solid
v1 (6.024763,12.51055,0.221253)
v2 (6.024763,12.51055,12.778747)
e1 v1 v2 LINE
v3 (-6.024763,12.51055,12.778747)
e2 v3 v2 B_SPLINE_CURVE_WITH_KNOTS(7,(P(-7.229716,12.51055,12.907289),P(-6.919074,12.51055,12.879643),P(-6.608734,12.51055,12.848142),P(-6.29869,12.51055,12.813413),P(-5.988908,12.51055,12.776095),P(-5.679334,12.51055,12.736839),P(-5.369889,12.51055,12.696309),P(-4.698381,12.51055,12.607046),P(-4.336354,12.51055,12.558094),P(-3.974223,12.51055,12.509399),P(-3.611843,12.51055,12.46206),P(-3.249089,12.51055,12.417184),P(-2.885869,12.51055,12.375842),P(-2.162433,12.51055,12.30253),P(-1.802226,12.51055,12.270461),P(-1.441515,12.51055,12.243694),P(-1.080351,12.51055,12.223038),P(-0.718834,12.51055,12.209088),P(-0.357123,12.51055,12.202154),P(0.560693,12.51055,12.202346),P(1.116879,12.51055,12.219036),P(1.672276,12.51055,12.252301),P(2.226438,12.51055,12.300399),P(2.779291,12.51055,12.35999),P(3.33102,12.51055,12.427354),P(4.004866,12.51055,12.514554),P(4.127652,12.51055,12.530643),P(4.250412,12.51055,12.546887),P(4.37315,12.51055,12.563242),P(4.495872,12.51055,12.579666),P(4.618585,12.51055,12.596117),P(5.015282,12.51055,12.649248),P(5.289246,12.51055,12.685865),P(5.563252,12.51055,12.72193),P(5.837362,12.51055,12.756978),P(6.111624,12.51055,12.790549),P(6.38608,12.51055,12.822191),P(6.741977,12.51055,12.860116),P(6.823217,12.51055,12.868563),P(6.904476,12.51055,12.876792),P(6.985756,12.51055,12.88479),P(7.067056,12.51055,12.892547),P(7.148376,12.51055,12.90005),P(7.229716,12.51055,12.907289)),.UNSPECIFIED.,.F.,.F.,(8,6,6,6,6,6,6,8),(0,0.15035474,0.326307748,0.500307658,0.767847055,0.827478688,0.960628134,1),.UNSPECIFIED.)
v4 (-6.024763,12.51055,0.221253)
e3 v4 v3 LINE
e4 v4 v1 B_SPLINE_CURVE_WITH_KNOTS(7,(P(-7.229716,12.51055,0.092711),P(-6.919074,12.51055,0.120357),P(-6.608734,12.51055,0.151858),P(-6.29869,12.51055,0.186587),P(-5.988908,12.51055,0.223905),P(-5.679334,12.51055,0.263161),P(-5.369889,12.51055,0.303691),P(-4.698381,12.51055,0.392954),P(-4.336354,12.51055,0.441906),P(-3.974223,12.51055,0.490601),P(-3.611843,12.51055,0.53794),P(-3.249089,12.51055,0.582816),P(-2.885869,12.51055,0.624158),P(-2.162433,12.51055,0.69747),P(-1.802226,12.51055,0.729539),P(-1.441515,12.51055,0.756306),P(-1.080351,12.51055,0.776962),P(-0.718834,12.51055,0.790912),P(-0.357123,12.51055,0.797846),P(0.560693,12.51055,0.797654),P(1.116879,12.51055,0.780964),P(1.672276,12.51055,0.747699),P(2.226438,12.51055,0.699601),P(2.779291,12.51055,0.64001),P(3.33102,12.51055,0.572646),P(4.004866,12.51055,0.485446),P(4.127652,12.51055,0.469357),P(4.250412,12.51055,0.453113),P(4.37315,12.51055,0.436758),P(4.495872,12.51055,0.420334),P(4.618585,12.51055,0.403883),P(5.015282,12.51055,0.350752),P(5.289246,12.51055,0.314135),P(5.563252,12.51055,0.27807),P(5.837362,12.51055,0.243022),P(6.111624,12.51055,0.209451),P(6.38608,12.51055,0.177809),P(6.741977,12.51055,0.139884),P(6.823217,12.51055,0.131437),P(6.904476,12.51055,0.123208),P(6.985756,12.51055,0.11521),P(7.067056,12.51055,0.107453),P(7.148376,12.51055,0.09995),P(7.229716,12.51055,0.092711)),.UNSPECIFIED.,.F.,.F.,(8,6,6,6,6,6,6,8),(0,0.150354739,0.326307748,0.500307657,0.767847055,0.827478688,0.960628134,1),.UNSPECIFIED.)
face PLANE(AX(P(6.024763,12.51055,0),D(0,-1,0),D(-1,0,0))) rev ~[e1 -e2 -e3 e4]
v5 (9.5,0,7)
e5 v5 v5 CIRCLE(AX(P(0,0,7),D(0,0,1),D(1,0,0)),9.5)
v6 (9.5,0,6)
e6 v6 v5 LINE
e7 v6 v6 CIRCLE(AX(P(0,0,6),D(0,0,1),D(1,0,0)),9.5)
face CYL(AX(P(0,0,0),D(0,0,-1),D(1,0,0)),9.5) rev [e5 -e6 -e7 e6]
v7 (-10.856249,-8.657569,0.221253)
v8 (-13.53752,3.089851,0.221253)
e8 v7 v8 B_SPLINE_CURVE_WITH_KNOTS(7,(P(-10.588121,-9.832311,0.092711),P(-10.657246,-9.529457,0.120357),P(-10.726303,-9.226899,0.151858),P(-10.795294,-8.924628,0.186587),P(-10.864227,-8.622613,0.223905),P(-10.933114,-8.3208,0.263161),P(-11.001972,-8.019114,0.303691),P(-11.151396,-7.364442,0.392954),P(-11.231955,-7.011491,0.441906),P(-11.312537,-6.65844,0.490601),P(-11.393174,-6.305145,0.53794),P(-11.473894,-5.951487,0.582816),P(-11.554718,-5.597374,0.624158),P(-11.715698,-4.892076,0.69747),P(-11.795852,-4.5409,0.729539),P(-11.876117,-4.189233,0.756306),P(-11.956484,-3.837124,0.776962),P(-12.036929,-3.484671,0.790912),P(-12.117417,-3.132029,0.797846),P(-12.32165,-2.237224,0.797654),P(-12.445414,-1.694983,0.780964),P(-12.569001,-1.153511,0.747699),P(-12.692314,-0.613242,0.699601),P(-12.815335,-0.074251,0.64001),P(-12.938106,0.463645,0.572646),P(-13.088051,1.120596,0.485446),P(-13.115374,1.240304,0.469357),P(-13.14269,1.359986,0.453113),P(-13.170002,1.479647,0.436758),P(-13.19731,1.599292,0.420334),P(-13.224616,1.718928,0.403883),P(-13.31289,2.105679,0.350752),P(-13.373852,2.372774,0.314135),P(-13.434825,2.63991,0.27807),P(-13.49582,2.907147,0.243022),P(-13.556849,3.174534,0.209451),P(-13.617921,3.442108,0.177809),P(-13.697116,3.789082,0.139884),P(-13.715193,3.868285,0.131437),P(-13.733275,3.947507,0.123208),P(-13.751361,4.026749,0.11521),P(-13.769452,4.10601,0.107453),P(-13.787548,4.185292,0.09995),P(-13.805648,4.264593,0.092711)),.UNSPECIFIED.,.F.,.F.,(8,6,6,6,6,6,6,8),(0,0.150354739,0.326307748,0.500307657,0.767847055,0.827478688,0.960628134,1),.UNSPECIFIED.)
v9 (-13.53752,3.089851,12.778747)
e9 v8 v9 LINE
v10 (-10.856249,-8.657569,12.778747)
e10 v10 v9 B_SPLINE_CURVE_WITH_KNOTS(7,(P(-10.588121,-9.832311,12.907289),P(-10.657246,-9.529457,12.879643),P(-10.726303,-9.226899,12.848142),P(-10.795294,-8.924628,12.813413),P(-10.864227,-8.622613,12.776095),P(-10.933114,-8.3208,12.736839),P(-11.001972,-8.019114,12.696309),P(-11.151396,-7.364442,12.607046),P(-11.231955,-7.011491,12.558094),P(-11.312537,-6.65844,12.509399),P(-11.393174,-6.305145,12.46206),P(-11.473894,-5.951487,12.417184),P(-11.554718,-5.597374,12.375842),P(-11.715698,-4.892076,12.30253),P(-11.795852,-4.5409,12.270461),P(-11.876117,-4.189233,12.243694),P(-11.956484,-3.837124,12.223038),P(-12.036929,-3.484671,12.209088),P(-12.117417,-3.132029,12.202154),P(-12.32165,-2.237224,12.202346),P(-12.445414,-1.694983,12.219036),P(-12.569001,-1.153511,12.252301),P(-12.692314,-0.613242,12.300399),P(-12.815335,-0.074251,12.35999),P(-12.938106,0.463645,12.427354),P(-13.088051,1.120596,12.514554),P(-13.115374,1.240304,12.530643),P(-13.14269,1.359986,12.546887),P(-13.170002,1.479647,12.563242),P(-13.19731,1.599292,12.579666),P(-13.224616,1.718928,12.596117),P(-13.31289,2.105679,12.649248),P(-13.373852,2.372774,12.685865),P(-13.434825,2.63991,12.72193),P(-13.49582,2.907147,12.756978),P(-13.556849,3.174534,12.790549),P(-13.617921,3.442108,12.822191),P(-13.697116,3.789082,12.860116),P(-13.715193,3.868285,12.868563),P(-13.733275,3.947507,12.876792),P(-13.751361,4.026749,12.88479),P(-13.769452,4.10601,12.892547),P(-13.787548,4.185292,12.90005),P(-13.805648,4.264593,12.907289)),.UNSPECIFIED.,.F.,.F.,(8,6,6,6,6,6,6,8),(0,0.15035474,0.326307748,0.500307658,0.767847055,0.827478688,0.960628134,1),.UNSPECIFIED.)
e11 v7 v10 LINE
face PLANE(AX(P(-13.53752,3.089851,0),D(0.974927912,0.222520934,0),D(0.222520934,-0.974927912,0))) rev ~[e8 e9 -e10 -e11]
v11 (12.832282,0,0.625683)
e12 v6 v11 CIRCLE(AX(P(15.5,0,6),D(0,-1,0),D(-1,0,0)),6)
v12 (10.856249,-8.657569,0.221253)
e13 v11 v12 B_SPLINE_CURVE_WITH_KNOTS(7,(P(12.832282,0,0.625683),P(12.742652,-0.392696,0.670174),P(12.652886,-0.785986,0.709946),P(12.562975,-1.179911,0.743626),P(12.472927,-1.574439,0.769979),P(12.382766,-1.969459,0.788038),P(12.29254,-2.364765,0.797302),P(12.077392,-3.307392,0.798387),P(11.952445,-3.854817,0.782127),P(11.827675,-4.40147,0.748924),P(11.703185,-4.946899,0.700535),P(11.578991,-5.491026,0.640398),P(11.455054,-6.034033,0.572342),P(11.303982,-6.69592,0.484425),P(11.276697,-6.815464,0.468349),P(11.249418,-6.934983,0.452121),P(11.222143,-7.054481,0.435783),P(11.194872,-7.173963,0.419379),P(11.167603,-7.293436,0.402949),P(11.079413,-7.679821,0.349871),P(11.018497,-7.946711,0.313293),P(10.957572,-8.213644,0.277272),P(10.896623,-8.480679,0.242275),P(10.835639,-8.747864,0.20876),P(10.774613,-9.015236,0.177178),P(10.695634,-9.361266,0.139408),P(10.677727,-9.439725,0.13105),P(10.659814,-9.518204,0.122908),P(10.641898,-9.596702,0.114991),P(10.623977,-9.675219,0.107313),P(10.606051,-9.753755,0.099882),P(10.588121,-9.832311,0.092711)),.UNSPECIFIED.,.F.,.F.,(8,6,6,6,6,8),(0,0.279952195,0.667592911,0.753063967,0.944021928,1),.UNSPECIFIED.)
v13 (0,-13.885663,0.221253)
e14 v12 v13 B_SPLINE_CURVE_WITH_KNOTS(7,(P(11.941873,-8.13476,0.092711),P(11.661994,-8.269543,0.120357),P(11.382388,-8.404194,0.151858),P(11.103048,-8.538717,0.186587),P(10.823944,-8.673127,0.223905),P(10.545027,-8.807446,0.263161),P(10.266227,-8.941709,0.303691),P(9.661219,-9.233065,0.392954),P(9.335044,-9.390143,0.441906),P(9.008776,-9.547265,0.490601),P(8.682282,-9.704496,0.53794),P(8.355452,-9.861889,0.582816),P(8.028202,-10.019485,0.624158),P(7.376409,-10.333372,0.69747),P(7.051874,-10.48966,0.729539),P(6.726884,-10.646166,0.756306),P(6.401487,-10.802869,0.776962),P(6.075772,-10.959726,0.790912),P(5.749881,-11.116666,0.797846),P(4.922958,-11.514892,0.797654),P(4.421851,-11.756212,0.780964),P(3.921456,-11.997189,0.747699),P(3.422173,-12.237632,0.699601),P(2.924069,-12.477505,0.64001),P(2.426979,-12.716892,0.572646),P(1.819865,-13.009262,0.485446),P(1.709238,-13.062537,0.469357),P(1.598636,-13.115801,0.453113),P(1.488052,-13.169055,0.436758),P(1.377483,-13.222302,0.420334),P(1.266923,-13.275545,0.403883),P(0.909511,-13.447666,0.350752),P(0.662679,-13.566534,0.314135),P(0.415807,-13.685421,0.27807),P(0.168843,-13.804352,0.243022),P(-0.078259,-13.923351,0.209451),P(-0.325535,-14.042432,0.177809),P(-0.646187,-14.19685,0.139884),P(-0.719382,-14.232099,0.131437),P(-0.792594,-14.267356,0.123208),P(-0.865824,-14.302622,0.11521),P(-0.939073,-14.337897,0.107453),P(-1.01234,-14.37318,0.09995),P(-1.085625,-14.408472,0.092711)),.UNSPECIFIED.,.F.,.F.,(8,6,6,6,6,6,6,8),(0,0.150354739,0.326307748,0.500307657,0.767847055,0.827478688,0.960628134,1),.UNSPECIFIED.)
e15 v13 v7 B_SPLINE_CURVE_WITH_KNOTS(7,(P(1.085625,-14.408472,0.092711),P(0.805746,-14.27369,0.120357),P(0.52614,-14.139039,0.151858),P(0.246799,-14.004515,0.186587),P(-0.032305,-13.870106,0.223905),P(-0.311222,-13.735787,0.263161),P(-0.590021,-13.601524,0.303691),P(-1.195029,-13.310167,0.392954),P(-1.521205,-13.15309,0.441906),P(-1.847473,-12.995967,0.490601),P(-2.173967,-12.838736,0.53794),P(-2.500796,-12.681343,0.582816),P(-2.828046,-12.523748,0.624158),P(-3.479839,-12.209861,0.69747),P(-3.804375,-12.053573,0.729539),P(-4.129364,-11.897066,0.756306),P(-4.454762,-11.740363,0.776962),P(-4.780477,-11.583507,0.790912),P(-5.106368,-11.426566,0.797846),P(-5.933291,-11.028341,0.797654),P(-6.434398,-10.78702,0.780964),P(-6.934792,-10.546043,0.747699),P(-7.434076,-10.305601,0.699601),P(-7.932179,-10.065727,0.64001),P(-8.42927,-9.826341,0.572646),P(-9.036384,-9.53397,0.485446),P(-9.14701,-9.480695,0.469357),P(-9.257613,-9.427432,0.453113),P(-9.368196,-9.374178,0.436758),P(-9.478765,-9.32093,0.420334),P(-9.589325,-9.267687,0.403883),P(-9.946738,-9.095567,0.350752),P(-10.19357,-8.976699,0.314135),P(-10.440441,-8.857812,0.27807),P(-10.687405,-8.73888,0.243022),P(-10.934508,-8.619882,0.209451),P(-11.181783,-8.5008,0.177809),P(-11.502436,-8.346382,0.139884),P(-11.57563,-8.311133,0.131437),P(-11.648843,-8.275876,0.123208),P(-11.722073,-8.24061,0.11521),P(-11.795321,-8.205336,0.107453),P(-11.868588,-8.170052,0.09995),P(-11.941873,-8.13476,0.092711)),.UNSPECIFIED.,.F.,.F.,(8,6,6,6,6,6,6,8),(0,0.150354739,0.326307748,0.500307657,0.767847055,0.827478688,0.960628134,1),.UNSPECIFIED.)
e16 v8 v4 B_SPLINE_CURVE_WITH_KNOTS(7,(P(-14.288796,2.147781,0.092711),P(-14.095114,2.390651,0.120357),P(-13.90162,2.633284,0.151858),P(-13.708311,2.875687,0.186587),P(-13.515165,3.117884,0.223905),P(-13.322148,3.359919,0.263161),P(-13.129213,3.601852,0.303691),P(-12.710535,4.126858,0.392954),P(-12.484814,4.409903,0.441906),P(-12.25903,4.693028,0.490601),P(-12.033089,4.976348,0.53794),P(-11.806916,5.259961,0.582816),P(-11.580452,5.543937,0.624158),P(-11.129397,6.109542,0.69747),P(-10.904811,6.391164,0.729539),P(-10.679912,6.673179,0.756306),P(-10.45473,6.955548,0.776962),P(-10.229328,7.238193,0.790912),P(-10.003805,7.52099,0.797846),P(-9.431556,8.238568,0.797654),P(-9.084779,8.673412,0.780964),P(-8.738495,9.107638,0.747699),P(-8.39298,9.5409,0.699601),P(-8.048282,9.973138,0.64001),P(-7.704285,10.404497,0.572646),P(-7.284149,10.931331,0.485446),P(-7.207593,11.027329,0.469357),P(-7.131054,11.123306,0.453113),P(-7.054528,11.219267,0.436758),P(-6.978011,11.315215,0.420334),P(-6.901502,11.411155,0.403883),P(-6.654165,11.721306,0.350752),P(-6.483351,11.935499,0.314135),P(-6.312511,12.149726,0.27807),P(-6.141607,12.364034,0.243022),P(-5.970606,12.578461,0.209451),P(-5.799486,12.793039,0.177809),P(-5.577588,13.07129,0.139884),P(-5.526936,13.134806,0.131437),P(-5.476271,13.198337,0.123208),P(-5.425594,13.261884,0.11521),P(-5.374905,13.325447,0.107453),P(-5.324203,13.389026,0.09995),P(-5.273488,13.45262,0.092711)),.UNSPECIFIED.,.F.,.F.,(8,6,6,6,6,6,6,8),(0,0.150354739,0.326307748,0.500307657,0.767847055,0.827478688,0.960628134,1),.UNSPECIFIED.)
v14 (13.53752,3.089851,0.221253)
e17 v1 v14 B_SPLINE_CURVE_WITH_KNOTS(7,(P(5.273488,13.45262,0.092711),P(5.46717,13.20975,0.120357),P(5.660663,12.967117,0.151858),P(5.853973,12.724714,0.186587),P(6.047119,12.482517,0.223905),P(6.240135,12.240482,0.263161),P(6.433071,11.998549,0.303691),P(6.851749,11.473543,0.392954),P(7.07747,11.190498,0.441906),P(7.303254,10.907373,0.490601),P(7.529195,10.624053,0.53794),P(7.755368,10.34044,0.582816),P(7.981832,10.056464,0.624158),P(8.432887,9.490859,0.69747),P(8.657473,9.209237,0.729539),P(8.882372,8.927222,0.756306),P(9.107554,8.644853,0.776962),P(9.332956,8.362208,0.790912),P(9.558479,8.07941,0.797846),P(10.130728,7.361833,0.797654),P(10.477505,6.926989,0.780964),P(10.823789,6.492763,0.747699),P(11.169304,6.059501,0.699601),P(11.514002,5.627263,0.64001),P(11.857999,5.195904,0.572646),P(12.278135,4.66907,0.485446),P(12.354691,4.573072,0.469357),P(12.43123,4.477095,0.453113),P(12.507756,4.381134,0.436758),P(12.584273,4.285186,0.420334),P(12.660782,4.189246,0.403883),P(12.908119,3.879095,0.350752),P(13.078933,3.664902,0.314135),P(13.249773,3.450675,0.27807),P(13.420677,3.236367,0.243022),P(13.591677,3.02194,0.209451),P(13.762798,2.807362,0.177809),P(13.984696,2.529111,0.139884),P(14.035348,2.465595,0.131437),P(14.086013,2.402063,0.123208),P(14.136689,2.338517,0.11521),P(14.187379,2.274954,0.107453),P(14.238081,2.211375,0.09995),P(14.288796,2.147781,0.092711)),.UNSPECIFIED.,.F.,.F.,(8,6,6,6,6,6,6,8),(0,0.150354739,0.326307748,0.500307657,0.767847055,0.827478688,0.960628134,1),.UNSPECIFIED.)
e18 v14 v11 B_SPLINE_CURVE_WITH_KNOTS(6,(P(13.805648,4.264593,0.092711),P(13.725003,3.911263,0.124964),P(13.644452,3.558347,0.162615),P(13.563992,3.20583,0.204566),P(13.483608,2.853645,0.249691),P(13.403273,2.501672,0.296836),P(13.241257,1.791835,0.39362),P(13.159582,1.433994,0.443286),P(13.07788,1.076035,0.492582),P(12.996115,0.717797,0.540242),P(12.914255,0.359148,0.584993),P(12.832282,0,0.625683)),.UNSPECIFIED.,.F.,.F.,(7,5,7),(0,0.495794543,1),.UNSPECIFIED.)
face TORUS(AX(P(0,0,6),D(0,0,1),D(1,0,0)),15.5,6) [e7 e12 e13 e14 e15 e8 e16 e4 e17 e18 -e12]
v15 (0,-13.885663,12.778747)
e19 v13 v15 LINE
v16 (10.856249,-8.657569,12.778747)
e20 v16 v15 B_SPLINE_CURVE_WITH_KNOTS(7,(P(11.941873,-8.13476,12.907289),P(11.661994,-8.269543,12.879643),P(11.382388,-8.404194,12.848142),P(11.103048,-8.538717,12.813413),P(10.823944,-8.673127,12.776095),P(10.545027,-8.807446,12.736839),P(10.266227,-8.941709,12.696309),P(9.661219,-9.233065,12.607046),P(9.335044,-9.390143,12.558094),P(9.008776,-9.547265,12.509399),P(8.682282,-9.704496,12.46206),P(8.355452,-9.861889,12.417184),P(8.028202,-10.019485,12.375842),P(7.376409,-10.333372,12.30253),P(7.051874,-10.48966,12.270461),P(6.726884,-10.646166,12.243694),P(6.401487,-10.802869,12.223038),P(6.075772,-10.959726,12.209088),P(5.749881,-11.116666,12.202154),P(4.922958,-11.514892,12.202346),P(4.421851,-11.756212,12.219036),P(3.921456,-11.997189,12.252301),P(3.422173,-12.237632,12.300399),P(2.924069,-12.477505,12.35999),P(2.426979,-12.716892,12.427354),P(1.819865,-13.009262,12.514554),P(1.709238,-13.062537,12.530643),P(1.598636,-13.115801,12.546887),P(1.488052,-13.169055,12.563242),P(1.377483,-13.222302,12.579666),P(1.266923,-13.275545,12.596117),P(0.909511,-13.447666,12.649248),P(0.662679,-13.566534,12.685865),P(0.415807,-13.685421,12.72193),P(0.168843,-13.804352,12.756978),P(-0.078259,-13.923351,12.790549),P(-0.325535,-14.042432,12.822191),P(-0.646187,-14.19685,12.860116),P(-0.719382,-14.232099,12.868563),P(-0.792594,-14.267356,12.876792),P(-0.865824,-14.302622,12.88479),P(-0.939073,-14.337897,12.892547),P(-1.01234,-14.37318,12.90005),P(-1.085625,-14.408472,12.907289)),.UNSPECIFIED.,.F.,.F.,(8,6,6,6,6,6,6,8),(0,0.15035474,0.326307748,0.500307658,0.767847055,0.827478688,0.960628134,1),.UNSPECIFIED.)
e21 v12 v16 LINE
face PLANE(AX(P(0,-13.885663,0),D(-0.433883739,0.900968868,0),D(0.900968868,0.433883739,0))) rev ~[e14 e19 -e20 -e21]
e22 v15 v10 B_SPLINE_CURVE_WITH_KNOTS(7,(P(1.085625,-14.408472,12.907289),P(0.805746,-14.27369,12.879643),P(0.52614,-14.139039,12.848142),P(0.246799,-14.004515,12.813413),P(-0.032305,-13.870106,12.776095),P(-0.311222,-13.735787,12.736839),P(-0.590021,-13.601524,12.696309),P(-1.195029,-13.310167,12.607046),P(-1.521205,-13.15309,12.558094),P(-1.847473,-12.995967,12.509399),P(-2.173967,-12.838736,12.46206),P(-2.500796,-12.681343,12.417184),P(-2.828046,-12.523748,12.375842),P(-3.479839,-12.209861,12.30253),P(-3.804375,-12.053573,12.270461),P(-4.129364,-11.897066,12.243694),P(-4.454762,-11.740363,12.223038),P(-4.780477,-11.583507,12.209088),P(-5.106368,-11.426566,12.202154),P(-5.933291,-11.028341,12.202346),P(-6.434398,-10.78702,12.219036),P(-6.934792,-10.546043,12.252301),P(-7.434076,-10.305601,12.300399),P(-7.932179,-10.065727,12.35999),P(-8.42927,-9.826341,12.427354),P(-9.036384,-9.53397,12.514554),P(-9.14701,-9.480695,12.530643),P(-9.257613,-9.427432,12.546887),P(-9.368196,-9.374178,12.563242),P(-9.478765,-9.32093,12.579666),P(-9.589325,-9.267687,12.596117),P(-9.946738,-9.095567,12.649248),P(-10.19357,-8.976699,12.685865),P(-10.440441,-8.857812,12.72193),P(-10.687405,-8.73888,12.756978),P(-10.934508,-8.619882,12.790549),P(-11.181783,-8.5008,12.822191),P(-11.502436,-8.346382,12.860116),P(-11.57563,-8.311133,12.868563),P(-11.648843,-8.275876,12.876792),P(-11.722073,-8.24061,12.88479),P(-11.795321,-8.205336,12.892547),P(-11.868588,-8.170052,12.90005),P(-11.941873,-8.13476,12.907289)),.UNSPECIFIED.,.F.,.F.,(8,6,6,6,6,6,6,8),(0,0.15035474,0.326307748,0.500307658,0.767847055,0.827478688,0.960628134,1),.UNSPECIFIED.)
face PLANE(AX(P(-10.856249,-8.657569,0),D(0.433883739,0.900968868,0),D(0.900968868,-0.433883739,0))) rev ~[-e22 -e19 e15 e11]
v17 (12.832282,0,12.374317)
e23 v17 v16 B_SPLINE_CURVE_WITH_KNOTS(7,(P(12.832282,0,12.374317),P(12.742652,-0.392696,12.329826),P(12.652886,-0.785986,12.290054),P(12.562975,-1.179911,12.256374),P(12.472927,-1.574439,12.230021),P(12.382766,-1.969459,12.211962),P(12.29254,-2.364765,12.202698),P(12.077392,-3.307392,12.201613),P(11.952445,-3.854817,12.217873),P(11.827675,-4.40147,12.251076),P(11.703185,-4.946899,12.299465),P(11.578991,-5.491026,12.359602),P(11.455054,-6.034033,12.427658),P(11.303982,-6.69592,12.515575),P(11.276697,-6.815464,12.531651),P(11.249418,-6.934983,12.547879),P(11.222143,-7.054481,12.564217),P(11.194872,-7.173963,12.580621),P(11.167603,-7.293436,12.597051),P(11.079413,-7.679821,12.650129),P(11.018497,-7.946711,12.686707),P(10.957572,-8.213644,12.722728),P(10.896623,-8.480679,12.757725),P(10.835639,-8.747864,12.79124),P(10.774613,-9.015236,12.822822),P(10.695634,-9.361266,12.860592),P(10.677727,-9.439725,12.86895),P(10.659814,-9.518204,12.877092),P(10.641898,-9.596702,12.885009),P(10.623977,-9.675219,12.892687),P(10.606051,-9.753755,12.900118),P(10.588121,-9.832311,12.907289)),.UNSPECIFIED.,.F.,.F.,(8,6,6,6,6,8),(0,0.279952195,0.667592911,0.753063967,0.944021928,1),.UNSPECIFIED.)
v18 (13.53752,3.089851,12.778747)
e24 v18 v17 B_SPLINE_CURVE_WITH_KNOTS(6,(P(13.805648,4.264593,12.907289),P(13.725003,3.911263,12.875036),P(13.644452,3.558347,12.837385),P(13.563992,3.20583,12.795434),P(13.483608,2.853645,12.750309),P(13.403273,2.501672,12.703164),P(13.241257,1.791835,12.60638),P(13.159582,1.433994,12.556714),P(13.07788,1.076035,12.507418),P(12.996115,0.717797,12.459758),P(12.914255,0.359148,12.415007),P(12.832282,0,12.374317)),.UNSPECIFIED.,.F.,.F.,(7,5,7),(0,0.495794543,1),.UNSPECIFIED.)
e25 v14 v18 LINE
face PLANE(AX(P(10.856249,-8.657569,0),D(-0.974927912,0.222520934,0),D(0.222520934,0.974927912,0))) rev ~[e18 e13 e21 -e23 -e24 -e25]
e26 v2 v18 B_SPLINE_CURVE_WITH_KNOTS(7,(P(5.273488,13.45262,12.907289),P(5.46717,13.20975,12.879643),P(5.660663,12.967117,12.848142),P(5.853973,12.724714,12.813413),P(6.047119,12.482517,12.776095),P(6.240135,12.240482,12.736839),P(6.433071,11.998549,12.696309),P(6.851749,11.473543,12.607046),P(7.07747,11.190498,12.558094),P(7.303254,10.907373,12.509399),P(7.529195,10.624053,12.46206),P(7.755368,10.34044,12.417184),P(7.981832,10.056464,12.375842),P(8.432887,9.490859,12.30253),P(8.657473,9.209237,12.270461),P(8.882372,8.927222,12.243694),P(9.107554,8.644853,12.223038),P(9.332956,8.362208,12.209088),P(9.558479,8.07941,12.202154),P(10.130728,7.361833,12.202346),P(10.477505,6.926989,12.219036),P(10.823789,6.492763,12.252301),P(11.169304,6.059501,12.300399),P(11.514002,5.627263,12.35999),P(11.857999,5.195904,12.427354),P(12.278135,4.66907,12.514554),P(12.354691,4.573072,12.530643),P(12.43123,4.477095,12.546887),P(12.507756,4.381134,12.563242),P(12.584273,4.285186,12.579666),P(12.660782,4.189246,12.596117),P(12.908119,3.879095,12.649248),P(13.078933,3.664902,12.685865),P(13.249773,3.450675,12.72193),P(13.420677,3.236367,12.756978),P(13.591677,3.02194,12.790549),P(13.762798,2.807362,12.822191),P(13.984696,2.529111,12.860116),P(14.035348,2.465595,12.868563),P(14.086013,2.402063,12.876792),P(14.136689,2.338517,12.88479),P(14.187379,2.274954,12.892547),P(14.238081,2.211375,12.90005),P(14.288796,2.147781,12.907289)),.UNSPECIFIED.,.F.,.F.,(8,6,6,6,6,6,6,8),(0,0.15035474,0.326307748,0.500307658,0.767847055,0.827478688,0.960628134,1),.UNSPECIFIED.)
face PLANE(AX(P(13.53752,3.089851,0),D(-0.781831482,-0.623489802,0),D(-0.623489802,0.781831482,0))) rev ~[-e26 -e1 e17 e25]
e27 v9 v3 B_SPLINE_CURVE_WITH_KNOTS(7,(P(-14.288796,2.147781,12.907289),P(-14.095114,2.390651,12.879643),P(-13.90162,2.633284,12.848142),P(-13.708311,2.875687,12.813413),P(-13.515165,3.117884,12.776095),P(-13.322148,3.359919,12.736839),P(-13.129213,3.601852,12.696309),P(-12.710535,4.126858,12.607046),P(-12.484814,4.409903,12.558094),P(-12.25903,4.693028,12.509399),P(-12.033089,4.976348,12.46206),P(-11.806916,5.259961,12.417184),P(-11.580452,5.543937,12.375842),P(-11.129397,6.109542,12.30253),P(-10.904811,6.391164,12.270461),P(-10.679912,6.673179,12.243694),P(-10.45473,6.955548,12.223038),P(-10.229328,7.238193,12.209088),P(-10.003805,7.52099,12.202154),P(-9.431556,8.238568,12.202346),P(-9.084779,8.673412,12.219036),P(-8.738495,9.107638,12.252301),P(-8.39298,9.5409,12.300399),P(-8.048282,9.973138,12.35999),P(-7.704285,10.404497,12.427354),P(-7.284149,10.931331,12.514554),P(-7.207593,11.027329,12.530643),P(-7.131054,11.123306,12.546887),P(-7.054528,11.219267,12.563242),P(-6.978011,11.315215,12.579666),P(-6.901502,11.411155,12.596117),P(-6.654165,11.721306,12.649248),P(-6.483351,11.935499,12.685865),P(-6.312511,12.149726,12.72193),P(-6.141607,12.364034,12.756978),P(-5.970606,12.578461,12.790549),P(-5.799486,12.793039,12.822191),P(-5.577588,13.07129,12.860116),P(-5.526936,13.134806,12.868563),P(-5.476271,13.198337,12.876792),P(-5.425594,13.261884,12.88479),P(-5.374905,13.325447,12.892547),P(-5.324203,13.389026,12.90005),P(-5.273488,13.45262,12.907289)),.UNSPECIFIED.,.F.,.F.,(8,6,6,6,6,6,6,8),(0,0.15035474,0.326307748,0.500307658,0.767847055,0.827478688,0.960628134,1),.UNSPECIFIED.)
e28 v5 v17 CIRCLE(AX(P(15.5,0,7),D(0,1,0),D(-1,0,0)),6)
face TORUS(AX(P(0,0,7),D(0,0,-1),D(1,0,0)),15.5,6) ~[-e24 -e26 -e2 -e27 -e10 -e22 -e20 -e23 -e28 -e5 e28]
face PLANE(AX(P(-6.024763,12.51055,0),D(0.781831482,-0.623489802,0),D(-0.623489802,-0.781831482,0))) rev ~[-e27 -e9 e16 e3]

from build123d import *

# Parameters (mm, degrees)
F0_R     = 9.5
F1_DEPTH = 13


# Not quite as in the source:
# - a fillet or chamfer that OpenCascade refuses, or shapes differently, is made with other operations: its cross-section is extruded or revolved along the edge and cut away or added


with BuildPart() as f1:
    # F0 (on Top) → F1 (new body)
    with BuildSketch(Plane.XY):
        Polygon((6.024763409, 12.5105501281), (-6.024763409, 12.5105501281), (-13.5375204973, 3.0898507129), (-10.856248536, -8.6575693106), (0, -13.885663061), (10.856248536, -8.6575693106), (13.5375204973, 3.0898507129), align=None)
        Circle(F0_R, mode=Mode.SUBTRACT)
    extrude(amount=F1_DEPTH)

    # F2: fillet of radius 6 on 3 edges, made by hand

    # F2_s1 → F2_t2 (revolve, cut)
    with BuildSketch(Plane.XZ):
        with BuildLine():
            ThreePointArc((9.5, 6), (11.2573593129, 1.7573593129), (15.5, 0))
            Line((15.5, 0), (9.5, 0))
            Line((9.5, 0), (9.5, 6))
        make_face()
    revolve(axis=Axis((0, 0, 0), (0, 0, 1)), mode=Mode.SUBTRACT)

    # F2_s3 → F2_t4 (revolve, cut)
    with BuildSketch(Plane.XZ):
        with BuildLine():
            ThreePointArc((9.5, 7), (11.2573593129, 11.2426406871), (15.5, 13))
            Line((15.5, 13), (9.5, 13))
            Line((9.5, 13), (9.5, 7))
        make_face()
    revolve(axis=Axis((0, 0, 13), (0, 0, 1)), mode=Mode.SUBTRACT)


solid = f1.part
